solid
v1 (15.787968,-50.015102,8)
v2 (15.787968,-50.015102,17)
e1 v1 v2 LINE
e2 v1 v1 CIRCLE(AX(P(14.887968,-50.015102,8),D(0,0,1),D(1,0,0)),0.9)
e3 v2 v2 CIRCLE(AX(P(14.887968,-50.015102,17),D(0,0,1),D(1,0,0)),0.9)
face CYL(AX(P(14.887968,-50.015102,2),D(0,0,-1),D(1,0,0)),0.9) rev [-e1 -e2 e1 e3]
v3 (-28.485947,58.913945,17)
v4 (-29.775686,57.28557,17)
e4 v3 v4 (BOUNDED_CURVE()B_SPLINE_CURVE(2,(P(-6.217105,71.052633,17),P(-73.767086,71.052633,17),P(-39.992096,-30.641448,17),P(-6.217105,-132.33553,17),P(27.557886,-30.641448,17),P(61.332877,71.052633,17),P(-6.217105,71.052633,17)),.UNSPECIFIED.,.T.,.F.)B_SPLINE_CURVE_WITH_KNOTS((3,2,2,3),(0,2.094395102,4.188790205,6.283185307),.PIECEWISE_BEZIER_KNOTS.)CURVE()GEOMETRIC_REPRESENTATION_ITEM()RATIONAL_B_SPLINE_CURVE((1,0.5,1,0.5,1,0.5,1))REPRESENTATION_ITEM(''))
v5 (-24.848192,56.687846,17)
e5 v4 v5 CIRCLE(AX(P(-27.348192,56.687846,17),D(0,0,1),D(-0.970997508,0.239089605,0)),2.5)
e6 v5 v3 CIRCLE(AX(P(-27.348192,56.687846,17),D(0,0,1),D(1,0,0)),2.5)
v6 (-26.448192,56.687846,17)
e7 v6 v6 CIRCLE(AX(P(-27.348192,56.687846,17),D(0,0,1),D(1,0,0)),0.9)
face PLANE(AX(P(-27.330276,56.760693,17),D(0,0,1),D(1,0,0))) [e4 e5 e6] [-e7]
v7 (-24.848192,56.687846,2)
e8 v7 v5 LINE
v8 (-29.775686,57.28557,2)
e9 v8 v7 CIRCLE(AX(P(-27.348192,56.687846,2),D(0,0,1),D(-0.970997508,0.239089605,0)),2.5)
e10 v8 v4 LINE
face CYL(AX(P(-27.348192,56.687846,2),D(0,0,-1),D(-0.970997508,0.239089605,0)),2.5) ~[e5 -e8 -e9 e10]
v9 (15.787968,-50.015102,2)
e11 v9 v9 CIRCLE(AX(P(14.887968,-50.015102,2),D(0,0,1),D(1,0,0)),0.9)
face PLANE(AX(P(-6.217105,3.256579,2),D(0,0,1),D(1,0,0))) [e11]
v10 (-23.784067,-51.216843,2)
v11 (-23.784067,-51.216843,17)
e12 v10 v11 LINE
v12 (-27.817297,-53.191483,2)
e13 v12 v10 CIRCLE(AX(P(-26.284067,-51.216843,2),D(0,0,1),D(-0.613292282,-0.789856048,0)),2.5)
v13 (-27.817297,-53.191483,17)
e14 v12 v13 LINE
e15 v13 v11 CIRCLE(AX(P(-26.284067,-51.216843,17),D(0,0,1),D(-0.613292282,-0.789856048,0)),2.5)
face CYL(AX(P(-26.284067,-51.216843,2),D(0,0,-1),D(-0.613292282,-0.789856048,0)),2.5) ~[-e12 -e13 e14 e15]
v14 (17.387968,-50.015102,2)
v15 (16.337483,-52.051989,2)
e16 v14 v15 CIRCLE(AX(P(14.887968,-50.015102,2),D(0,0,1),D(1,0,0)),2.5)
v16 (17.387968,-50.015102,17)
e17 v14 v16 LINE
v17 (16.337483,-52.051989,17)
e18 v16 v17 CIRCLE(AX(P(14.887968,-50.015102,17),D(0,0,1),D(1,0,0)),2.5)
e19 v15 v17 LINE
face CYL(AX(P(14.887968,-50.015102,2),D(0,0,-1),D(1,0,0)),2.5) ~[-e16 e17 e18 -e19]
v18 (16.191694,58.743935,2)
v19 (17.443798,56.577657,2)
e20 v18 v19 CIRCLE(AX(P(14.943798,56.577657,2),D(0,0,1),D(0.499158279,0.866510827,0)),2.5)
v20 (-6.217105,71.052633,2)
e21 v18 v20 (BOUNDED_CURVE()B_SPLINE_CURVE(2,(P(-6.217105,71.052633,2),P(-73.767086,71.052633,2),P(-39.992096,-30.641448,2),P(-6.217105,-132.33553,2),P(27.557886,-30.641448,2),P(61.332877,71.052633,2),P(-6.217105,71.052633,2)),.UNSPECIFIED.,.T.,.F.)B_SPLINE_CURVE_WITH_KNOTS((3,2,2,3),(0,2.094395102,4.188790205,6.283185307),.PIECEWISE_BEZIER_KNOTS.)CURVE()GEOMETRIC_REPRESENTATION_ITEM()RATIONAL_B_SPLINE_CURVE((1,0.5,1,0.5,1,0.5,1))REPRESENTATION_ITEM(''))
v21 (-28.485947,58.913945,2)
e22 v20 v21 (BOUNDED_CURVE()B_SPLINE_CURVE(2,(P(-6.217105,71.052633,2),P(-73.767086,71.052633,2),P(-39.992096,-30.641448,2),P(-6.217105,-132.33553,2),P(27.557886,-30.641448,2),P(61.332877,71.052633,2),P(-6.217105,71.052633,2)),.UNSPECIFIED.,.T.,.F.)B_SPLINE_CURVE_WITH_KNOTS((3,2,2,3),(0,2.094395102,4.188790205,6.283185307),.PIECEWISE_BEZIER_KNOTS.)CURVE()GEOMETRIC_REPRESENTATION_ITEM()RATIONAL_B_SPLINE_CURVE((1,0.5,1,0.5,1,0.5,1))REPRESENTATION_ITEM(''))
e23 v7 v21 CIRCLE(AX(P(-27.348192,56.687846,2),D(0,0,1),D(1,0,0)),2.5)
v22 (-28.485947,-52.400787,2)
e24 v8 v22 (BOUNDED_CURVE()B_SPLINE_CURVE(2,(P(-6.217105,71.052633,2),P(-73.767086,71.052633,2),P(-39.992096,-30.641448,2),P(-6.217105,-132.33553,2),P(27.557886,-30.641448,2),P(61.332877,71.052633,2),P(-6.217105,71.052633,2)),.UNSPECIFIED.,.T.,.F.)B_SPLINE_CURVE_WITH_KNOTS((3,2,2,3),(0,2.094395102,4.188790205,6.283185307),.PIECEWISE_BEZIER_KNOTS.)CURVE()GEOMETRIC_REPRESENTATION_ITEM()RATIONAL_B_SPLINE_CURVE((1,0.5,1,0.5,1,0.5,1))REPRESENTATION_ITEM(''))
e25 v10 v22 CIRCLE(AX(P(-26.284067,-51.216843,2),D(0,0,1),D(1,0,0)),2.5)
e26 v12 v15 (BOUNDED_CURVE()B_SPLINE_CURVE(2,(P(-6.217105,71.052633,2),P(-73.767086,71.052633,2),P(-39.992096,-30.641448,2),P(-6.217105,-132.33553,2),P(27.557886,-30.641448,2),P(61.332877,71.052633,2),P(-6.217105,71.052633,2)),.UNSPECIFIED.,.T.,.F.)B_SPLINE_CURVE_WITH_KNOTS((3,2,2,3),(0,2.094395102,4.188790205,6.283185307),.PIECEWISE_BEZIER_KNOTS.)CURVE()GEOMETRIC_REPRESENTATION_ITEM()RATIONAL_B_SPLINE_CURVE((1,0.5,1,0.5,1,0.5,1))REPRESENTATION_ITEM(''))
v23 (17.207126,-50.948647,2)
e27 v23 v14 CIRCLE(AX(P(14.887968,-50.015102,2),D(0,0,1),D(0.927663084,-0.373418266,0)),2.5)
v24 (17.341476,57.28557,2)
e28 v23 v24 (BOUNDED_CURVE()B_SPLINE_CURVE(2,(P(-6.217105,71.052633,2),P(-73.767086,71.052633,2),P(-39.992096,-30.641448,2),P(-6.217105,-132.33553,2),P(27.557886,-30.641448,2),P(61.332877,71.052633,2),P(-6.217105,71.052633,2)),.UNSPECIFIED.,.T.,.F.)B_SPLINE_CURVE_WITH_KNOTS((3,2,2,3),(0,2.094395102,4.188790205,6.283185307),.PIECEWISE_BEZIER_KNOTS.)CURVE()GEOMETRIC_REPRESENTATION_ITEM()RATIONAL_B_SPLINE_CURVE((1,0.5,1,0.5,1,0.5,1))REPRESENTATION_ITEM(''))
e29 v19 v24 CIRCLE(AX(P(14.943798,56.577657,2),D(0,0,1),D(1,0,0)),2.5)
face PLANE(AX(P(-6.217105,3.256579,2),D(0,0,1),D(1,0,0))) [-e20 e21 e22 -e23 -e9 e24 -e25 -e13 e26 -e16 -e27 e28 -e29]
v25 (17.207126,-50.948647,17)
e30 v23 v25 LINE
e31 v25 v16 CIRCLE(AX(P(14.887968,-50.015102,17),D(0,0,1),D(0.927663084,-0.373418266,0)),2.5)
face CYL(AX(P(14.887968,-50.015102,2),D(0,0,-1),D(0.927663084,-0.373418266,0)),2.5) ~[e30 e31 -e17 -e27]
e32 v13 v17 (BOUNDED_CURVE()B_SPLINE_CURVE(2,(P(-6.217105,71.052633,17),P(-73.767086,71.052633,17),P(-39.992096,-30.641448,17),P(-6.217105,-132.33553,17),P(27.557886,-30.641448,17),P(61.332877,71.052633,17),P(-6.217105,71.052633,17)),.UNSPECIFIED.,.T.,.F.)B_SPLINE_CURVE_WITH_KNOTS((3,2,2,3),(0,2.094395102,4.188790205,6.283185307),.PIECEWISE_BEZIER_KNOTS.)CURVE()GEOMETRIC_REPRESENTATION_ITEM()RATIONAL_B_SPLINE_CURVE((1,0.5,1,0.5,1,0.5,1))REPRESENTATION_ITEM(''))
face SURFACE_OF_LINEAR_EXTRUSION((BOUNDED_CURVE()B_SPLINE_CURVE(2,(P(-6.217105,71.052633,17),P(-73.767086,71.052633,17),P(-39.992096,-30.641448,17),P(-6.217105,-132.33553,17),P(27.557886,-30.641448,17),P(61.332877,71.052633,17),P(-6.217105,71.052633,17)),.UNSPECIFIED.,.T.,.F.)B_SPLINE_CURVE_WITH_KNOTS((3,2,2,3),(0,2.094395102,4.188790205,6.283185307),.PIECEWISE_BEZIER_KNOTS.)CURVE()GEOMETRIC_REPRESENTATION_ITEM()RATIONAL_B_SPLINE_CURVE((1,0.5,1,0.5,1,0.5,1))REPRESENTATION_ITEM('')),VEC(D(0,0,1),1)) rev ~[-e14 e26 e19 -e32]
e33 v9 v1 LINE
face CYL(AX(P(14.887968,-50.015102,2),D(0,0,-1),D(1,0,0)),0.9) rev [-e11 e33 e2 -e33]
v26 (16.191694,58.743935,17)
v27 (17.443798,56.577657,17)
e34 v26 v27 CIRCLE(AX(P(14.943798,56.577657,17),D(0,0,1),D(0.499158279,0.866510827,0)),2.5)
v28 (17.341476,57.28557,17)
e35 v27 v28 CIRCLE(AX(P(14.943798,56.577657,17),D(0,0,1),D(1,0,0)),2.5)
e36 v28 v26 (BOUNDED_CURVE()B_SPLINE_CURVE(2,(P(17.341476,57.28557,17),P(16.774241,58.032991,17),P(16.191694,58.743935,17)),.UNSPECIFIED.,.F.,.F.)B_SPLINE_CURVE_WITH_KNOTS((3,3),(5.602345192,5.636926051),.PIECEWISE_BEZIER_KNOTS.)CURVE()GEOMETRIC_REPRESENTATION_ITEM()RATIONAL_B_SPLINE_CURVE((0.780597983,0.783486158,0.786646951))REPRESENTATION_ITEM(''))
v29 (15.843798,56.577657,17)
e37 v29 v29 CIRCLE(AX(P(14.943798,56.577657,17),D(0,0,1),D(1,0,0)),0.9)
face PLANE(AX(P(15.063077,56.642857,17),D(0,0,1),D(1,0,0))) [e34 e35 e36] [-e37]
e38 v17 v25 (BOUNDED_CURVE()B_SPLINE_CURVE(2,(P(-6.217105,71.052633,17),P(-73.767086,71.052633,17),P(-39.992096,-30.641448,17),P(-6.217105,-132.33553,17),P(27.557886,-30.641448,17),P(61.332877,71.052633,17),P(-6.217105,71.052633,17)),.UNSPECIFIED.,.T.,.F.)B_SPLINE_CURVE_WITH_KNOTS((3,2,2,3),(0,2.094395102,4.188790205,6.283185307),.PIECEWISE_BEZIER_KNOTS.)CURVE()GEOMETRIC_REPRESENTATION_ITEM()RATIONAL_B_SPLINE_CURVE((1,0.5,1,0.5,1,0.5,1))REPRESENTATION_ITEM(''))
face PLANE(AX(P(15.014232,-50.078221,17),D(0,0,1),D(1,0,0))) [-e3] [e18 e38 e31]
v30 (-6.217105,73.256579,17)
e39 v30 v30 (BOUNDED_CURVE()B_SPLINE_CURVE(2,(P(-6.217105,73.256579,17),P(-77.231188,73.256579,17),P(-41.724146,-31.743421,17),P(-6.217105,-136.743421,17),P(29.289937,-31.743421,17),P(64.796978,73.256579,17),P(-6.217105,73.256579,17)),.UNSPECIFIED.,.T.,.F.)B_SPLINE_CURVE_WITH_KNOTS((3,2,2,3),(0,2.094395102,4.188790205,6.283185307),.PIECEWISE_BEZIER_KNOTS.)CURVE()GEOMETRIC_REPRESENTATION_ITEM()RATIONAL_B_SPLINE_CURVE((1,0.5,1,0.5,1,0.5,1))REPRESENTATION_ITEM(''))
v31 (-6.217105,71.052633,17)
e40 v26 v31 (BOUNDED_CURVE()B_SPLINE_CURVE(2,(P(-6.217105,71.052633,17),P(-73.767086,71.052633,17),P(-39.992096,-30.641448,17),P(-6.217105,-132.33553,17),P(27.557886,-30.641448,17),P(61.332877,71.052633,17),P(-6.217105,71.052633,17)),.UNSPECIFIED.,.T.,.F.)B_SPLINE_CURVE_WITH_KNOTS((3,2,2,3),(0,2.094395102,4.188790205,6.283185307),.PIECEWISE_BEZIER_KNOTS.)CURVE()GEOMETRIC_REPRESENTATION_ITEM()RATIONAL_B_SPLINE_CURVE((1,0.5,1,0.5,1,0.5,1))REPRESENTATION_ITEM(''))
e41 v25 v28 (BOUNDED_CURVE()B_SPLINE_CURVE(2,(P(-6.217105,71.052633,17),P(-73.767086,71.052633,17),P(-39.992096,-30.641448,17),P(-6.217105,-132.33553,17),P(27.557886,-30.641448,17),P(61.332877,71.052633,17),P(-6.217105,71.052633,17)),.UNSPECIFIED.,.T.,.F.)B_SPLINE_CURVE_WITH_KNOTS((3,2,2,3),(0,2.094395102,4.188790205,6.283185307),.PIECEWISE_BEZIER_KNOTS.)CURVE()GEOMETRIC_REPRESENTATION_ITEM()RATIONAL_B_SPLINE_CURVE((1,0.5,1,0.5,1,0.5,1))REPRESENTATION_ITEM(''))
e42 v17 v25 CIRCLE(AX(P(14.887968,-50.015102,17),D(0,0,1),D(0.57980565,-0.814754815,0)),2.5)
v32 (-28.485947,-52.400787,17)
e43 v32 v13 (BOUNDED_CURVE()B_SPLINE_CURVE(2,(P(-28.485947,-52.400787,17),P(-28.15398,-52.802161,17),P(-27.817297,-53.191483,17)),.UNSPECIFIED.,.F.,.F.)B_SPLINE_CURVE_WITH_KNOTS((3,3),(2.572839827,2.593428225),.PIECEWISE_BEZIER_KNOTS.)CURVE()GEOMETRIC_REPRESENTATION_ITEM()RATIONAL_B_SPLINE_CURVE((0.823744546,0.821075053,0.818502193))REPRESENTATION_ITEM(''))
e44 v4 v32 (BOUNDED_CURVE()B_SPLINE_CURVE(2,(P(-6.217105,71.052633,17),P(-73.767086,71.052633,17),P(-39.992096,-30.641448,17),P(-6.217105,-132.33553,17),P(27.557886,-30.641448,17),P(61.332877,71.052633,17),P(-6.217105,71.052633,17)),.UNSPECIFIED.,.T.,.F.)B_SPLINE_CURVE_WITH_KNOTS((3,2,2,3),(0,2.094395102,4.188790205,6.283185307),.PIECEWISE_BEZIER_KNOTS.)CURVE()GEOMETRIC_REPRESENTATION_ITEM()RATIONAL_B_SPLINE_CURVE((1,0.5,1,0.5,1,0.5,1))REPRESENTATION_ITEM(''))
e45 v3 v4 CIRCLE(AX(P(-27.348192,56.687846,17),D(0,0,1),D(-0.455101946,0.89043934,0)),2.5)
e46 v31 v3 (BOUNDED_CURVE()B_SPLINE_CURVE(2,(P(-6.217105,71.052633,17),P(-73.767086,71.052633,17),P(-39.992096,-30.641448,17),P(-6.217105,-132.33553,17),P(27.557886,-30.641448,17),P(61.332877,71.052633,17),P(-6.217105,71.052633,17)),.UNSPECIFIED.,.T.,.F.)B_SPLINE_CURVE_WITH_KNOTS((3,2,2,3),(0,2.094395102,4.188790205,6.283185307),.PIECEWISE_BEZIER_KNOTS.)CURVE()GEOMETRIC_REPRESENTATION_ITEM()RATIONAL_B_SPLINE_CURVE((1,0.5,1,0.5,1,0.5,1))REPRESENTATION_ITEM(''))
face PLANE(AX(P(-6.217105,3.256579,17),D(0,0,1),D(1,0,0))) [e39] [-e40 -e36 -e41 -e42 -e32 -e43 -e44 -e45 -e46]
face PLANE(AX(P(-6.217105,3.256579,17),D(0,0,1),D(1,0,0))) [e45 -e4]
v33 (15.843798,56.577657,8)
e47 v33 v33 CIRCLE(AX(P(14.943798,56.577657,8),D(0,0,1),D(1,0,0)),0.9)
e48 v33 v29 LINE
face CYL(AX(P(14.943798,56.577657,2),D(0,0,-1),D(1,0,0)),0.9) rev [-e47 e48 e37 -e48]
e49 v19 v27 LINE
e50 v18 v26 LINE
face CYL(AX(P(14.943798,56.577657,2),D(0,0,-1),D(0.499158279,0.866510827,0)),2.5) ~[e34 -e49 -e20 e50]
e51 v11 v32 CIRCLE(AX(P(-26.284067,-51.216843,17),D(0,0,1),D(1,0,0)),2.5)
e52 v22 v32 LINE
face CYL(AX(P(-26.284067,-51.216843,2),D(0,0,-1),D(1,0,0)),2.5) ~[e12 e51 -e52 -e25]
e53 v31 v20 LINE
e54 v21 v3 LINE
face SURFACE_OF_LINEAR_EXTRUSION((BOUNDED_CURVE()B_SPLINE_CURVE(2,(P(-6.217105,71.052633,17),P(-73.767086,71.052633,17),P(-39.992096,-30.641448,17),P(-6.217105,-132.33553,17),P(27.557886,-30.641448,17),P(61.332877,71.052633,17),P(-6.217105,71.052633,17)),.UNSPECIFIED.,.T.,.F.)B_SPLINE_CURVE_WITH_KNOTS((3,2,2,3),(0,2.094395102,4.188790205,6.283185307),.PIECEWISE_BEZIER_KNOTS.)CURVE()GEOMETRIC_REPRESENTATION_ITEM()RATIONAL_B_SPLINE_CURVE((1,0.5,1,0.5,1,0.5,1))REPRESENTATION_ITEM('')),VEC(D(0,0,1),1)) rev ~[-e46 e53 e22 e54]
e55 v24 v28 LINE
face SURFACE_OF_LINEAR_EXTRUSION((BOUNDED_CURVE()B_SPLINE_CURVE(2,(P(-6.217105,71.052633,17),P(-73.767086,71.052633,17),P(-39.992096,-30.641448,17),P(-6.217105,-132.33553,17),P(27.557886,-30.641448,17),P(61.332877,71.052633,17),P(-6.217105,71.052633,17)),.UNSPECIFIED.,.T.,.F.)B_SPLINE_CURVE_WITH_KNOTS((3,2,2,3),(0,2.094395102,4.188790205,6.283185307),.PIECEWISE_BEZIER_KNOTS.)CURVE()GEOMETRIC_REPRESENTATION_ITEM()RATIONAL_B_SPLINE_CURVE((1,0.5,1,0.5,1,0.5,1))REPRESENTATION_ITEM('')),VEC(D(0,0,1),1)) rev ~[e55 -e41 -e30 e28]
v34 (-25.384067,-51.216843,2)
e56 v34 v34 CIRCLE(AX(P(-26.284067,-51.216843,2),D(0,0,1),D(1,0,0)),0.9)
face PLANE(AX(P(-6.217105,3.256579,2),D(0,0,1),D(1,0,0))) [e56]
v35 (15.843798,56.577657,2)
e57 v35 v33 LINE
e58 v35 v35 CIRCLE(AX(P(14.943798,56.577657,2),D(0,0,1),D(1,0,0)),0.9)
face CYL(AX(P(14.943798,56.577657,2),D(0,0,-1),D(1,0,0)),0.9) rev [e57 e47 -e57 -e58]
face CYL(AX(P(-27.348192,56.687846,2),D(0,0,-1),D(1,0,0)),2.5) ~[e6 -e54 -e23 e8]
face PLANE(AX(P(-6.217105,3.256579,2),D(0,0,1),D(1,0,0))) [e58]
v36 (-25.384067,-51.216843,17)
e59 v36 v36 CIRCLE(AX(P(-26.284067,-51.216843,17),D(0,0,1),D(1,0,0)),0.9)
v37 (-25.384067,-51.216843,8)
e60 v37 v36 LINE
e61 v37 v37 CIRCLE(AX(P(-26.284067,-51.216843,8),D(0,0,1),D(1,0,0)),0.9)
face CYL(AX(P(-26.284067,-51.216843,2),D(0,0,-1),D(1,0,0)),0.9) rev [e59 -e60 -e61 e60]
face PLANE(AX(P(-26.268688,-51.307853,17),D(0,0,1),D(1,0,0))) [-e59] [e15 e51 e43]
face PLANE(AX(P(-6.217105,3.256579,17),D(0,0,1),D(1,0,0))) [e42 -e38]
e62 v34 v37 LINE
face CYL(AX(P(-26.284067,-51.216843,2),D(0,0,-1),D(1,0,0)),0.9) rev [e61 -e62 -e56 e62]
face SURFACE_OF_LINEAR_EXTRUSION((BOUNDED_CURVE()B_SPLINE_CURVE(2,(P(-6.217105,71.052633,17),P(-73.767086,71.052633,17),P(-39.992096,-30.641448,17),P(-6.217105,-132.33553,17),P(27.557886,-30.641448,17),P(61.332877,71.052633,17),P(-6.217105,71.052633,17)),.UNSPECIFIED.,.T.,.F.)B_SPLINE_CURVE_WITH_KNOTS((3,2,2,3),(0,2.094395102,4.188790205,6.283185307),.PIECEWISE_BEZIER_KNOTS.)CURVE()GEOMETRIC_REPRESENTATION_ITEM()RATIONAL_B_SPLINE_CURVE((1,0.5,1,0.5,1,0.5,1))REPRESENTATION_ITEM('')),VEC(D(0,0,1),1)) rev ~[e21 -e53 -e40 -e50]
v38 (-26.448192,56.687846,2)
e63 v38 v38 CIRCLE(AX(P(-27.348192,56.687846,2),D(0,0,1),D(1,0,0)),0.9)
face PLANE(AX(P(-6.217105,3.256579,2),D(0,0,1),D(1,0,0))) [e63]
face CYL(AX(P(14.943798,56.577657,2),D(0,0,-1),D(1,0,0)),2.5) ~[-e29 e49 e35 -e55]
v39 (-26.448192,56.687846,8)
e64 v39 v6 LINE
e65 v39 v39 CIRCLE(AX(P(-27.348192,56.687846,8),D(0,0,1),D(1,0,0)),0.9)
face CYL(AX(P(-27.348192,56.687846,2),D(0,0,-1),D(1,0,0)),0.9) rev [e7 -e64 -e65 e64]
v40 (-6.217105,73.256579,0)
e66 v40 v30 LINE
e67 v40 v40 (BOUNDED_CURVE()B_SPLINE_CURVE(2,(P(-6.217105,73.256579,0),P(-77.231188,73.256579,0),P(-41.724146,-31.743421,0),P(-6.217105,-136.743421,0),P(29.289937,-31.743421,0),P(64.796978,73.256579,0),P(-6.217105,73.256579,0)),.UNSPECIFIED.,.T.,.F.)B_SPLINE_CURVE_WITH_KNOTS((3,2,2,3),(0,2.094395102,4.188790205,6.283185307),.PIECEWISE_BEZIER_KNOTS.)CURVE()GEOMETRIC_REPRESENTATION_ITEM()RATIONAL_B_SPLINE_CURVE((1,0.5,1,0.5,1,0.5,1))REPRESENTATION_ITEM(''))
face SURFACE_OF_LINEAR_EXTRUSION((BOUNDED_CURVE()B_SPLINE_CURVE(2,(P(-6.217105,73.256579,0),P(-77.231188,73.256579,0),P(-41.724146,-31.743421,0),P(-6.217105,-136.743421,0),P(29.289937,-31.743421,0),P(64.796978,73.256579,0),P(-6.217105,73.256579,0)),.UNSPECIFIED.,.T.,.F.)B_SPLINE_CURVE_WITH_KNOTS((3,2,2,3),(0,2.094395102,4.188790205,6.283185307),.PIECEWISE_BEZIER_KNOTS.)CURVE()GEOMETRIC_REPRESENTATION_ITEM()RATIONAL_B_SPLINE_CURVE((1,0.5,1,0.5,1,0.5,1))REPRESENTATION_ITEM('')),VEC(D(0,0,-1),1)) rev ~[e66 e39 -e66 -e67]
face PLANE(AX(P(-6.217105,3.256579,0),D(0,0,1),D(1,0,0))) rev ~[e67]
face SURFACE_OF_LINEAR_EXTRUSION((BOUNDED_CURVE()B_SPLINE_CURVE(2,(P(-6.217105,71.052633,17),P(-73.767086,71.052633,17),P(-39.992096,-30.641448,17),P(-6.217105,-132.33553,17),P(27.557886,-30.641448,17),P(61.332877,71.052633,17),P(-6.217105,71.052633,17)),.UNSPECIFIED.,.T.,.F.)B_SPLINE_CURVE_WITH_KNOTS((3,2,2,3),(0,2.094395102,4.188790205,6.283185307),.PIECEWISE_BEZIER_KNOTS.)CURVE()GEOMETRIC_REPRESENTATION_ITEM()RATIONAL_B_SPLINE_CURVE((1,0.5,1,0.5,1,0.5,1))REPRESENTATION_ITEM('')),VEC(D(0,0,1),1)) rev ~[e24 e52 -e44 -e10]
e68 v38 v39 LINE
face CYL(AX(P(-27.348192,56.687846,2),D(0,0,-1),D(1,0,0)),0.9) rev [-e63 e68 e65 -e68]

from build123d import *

# Parameters (mm, degrees)
F1_DEPTH  = 17
F3_DEPTH  = 15
F4_R      = 0.9
F5_DEPTH  = 15
F6_R      = 0.9
F7_DEPTH  = 15
F8_R      = 0.9
F9_DEPTH  = 15
F10_R     = 0.9
F11_DEPTH = 15
F13_R     = 0.9
F14_DEPTH = 9


with BuildPart() as f1:
    # F0 (on Top) → F1 (new body)
    with BuildSketch(Plane.XY):
        with BuildLine():
            add(Edge.make_bspline(
                [(-6.2171048485, 73.2565789297), (-77.2311879588, 73.2565789297), (-41.7241464036, -31.7434210703), (-6.2171048485, -136.7434210703), (29.2899367067, -31.7434210703), (64.7969782618, 73.2565789297), (-6.2171048485, 73.2565789297)],
                knots=[0, 0, 0, 2.0943951024, 2.0943951024, 4.1887902048, 4.1887902048, 6.2831853072, 6.2831853072, 6.2831853072], degree=2, weights=[1, 0.5, 1, 0.5, 1, 0.5, 1]))
        make_face()
    extrude(amount=F1_DEPTH)

    # F2 (on face) → F3 (cut)
    with BuildSketch(Plane.XY.offset(17)):
        with BuildLine():
            add(Edge.make_bspline(
                [(-6.2171048485, 71.0526332259), (-73.7670863437, 71.0526332259), (-39.9920955961, -30.6414482184), (-6.2171048485, -132.3355296627), (27.5578858991, -30.6414482184), (61.3328766467, 71.0526332259), (-6.2171048485, 71.0526332259)],
                knots=[0, 0, 0, 2.0943951024, 2.0943951024, 4.1887902048, 4.1887902048, 6.2831853072, 6.2831853072, 6.2831853072], degree=2, weights=[1, 0.5, 1, 0.5, 1, 0.5, 1]))
        make_face()
    extrude(amount=-F3_DEPTH, mode=Mode.SUBTRACT)

    # F4 (on face) → F5 (join)
    with BuildSketch(Plane.XY.offset(2)):
        with BuildLine():
            ThreePointArc((-29.7756858862, 57.2855702673), (-27.6492449133, 54.2060390081), (-24.8481921157, 56.6878462554))
            ThreePointArc((-24.8481921157, 56.6878462554), (-26.0432758657, 58.8202612198), (-28.48594698, 58.9139446065))
            add(Edge.make_bspline(
                [(-28.48594698, 58.9139446065), (-29.1403899926, 58.1226714215), (-29.7756858862, 57.2855702673)],
                knots=[0.6420928407, 0.6420928407, 0.6420928407, 0.6808401148, 0.6808401148, 0.6808401148], degree=2, weights=[0.7874125542, 0.783834135, 0.7805979828]))
        make_face()
        with Locations((-27.3481921157, 56.6878462554)):
            Circle(F4_R, mode=Mode.SUBTRACT)
        with BuildLine():
            add(Edge.make_bspline(
                [(-28.48594698, 58.9139446065), (-29.1403899926, 58.1226714215), (-29.7756858862, 57.2855702673)],
                knots=[0.6420928407, 0.6420928407, 0.6420928407, 0.6808401148, 0.6808401148, 0.6808401148], degree=2, weights=[0.7874125542, 0.783834135, 0.7805979828]))
            ThreePointArc((-28.48594698, 58.9139446065), (-29.3079498058, 58.2400542943), (-29.7756858862, 57.2855702673))
        make_face()
    extrude(amount=F5_DEPTH)

    # F6 (on face) → F7 (join)
    with BuildSketch(Plane.XY.offset(2)):
        with BuildLine():
            ThreePointArc((16.1916939477, 58.7439345546), (12.7793422864, 55.3266057789), (17.4437982507, 56.577657488))
            ThreePointArc((17.4437982507, 56.577657488), (17.4180855063, 56.9352921855), (17.3414761892, 57.2855702673))
            add(Edge.make_bspline(
                [(17.3414761892, 57.2855702673), (16.7742405528, 58.0329914466), (16.1916939477, 58.7439345546)],
                knots=[5.6023451924, 5.6023451924, 5.6023451924, 5.6369260508, 5.6369260508, 5.6369260508], degree=2, weights=[0.7805979828, 0.7834861581, 0.7866469513]))
        make_face()
        with Locations((14.9437982507, 56.577657488)):
            Circle(F6_R, mode=Mode.SUBTRACT)
    extrude(amount=F7_DEPTH)

    # F8 (on face) → F9 (join)
    with BuildSketch(Plane.XY.offset(2)):
        with BuildLine():
            ThreePointArc((-27.8172974331, -53.191482885), (-25.1847662143, -53.4621797963), (-23.7840667271, -51.2168427654))
            ThreePointArc((-23.7840667271, -51.2168427654), (-26.8945171213, -48.792518052), (-28.48594698, -52.4007867471))
            add(Edge.make_bspline(
                [(-28.48594698, -52.4007867471), (-28.1539802485, -52.8021606908), (-27.8172974331, -53.191482885)],
                knots=[2.5728398269, 2.5728398269, 2.5728398269, 2.5934282254, 2.5934282254, 2.5934282254], degree=2, weights=[0.8237445465, 0.8210750527, 0.8185021925]))
        make_face()
        with Locations((-26.2840667271, -51.2168427654)):
            Circle(F8_R, mode=Mode.SUBTRACT)
    extrude(amount=F9_DEPTH)

    # F10 (on face) → F11 (join)
    with BuildSketch(Plane.XY.offset(2)):
        with BuildLine():
            ThreePointArc((17.2071260982, -50.948647347), (17.3423414514, -50.4905518475), (17.3879683871, -50.0151016807))
            ThreePointArc((17.3879683871, -50.0151016807), (12.6660564501, -48.8691927208), (16.3374825114, -52.0519887181))
            add(Edge.make_bspline(
                [(16.3374825114, -52.0519887181), (16.7766850943, -51.5107523345), (17.2071260982, -50.948647347)],
                knots=[3.7192756497, 3.7192756497, 3.7192756497, 3.746975358, 3.746975358, 3.746975358], degree=2, weights=[0.8260785, 0.8297264389, 0.8335492953]))
        make_face()
        with Locations((14.8879683871, -50.0151016807)):
            Circle(F10_R, mode=Mode.SUBTRACT)
        with BuildLine():
            add(Edge.make_bspline(
                [(16.3374825114, -52.0519887181), (16.7766850943, -51.5107523345), (17.2071260982, -50.948647347)],
                knots=[3.7192756497, 3.7192756497, 3.7192756497, 3.746975358, 3.746975358, 3.746975358], degree=2, weights=[0.8260785, 0.8297264389, 0.8335492953]))
            ThreePointArc((16.3374825114, -52.0519887181), (16.8513996683, -51.5626602753), (17.2071260982, -50.948647347))
        make_face()
    extrude(amount=F11_DEPTH)

    # F13 (on face) → F14 (cut)
    with BuildSketch(Plane.XY.offset(17)):
        with Locations((-27.3481921157, 56.6878462554)):
            Circle(F13_R)
        with Locations((14.9437982507, 56.577657488)):
            Circle(F13_R)
        with Locations((-26.2840667271, -51.2168427654)):
            Circle(F13_R)
        with Locations((14.8879683871, -50.0151016807)):
            Circle(F13_R)
    extrude(amount=-F14_DEPTH, mode=Mode.SUBTRACT)


solid = f1.part
